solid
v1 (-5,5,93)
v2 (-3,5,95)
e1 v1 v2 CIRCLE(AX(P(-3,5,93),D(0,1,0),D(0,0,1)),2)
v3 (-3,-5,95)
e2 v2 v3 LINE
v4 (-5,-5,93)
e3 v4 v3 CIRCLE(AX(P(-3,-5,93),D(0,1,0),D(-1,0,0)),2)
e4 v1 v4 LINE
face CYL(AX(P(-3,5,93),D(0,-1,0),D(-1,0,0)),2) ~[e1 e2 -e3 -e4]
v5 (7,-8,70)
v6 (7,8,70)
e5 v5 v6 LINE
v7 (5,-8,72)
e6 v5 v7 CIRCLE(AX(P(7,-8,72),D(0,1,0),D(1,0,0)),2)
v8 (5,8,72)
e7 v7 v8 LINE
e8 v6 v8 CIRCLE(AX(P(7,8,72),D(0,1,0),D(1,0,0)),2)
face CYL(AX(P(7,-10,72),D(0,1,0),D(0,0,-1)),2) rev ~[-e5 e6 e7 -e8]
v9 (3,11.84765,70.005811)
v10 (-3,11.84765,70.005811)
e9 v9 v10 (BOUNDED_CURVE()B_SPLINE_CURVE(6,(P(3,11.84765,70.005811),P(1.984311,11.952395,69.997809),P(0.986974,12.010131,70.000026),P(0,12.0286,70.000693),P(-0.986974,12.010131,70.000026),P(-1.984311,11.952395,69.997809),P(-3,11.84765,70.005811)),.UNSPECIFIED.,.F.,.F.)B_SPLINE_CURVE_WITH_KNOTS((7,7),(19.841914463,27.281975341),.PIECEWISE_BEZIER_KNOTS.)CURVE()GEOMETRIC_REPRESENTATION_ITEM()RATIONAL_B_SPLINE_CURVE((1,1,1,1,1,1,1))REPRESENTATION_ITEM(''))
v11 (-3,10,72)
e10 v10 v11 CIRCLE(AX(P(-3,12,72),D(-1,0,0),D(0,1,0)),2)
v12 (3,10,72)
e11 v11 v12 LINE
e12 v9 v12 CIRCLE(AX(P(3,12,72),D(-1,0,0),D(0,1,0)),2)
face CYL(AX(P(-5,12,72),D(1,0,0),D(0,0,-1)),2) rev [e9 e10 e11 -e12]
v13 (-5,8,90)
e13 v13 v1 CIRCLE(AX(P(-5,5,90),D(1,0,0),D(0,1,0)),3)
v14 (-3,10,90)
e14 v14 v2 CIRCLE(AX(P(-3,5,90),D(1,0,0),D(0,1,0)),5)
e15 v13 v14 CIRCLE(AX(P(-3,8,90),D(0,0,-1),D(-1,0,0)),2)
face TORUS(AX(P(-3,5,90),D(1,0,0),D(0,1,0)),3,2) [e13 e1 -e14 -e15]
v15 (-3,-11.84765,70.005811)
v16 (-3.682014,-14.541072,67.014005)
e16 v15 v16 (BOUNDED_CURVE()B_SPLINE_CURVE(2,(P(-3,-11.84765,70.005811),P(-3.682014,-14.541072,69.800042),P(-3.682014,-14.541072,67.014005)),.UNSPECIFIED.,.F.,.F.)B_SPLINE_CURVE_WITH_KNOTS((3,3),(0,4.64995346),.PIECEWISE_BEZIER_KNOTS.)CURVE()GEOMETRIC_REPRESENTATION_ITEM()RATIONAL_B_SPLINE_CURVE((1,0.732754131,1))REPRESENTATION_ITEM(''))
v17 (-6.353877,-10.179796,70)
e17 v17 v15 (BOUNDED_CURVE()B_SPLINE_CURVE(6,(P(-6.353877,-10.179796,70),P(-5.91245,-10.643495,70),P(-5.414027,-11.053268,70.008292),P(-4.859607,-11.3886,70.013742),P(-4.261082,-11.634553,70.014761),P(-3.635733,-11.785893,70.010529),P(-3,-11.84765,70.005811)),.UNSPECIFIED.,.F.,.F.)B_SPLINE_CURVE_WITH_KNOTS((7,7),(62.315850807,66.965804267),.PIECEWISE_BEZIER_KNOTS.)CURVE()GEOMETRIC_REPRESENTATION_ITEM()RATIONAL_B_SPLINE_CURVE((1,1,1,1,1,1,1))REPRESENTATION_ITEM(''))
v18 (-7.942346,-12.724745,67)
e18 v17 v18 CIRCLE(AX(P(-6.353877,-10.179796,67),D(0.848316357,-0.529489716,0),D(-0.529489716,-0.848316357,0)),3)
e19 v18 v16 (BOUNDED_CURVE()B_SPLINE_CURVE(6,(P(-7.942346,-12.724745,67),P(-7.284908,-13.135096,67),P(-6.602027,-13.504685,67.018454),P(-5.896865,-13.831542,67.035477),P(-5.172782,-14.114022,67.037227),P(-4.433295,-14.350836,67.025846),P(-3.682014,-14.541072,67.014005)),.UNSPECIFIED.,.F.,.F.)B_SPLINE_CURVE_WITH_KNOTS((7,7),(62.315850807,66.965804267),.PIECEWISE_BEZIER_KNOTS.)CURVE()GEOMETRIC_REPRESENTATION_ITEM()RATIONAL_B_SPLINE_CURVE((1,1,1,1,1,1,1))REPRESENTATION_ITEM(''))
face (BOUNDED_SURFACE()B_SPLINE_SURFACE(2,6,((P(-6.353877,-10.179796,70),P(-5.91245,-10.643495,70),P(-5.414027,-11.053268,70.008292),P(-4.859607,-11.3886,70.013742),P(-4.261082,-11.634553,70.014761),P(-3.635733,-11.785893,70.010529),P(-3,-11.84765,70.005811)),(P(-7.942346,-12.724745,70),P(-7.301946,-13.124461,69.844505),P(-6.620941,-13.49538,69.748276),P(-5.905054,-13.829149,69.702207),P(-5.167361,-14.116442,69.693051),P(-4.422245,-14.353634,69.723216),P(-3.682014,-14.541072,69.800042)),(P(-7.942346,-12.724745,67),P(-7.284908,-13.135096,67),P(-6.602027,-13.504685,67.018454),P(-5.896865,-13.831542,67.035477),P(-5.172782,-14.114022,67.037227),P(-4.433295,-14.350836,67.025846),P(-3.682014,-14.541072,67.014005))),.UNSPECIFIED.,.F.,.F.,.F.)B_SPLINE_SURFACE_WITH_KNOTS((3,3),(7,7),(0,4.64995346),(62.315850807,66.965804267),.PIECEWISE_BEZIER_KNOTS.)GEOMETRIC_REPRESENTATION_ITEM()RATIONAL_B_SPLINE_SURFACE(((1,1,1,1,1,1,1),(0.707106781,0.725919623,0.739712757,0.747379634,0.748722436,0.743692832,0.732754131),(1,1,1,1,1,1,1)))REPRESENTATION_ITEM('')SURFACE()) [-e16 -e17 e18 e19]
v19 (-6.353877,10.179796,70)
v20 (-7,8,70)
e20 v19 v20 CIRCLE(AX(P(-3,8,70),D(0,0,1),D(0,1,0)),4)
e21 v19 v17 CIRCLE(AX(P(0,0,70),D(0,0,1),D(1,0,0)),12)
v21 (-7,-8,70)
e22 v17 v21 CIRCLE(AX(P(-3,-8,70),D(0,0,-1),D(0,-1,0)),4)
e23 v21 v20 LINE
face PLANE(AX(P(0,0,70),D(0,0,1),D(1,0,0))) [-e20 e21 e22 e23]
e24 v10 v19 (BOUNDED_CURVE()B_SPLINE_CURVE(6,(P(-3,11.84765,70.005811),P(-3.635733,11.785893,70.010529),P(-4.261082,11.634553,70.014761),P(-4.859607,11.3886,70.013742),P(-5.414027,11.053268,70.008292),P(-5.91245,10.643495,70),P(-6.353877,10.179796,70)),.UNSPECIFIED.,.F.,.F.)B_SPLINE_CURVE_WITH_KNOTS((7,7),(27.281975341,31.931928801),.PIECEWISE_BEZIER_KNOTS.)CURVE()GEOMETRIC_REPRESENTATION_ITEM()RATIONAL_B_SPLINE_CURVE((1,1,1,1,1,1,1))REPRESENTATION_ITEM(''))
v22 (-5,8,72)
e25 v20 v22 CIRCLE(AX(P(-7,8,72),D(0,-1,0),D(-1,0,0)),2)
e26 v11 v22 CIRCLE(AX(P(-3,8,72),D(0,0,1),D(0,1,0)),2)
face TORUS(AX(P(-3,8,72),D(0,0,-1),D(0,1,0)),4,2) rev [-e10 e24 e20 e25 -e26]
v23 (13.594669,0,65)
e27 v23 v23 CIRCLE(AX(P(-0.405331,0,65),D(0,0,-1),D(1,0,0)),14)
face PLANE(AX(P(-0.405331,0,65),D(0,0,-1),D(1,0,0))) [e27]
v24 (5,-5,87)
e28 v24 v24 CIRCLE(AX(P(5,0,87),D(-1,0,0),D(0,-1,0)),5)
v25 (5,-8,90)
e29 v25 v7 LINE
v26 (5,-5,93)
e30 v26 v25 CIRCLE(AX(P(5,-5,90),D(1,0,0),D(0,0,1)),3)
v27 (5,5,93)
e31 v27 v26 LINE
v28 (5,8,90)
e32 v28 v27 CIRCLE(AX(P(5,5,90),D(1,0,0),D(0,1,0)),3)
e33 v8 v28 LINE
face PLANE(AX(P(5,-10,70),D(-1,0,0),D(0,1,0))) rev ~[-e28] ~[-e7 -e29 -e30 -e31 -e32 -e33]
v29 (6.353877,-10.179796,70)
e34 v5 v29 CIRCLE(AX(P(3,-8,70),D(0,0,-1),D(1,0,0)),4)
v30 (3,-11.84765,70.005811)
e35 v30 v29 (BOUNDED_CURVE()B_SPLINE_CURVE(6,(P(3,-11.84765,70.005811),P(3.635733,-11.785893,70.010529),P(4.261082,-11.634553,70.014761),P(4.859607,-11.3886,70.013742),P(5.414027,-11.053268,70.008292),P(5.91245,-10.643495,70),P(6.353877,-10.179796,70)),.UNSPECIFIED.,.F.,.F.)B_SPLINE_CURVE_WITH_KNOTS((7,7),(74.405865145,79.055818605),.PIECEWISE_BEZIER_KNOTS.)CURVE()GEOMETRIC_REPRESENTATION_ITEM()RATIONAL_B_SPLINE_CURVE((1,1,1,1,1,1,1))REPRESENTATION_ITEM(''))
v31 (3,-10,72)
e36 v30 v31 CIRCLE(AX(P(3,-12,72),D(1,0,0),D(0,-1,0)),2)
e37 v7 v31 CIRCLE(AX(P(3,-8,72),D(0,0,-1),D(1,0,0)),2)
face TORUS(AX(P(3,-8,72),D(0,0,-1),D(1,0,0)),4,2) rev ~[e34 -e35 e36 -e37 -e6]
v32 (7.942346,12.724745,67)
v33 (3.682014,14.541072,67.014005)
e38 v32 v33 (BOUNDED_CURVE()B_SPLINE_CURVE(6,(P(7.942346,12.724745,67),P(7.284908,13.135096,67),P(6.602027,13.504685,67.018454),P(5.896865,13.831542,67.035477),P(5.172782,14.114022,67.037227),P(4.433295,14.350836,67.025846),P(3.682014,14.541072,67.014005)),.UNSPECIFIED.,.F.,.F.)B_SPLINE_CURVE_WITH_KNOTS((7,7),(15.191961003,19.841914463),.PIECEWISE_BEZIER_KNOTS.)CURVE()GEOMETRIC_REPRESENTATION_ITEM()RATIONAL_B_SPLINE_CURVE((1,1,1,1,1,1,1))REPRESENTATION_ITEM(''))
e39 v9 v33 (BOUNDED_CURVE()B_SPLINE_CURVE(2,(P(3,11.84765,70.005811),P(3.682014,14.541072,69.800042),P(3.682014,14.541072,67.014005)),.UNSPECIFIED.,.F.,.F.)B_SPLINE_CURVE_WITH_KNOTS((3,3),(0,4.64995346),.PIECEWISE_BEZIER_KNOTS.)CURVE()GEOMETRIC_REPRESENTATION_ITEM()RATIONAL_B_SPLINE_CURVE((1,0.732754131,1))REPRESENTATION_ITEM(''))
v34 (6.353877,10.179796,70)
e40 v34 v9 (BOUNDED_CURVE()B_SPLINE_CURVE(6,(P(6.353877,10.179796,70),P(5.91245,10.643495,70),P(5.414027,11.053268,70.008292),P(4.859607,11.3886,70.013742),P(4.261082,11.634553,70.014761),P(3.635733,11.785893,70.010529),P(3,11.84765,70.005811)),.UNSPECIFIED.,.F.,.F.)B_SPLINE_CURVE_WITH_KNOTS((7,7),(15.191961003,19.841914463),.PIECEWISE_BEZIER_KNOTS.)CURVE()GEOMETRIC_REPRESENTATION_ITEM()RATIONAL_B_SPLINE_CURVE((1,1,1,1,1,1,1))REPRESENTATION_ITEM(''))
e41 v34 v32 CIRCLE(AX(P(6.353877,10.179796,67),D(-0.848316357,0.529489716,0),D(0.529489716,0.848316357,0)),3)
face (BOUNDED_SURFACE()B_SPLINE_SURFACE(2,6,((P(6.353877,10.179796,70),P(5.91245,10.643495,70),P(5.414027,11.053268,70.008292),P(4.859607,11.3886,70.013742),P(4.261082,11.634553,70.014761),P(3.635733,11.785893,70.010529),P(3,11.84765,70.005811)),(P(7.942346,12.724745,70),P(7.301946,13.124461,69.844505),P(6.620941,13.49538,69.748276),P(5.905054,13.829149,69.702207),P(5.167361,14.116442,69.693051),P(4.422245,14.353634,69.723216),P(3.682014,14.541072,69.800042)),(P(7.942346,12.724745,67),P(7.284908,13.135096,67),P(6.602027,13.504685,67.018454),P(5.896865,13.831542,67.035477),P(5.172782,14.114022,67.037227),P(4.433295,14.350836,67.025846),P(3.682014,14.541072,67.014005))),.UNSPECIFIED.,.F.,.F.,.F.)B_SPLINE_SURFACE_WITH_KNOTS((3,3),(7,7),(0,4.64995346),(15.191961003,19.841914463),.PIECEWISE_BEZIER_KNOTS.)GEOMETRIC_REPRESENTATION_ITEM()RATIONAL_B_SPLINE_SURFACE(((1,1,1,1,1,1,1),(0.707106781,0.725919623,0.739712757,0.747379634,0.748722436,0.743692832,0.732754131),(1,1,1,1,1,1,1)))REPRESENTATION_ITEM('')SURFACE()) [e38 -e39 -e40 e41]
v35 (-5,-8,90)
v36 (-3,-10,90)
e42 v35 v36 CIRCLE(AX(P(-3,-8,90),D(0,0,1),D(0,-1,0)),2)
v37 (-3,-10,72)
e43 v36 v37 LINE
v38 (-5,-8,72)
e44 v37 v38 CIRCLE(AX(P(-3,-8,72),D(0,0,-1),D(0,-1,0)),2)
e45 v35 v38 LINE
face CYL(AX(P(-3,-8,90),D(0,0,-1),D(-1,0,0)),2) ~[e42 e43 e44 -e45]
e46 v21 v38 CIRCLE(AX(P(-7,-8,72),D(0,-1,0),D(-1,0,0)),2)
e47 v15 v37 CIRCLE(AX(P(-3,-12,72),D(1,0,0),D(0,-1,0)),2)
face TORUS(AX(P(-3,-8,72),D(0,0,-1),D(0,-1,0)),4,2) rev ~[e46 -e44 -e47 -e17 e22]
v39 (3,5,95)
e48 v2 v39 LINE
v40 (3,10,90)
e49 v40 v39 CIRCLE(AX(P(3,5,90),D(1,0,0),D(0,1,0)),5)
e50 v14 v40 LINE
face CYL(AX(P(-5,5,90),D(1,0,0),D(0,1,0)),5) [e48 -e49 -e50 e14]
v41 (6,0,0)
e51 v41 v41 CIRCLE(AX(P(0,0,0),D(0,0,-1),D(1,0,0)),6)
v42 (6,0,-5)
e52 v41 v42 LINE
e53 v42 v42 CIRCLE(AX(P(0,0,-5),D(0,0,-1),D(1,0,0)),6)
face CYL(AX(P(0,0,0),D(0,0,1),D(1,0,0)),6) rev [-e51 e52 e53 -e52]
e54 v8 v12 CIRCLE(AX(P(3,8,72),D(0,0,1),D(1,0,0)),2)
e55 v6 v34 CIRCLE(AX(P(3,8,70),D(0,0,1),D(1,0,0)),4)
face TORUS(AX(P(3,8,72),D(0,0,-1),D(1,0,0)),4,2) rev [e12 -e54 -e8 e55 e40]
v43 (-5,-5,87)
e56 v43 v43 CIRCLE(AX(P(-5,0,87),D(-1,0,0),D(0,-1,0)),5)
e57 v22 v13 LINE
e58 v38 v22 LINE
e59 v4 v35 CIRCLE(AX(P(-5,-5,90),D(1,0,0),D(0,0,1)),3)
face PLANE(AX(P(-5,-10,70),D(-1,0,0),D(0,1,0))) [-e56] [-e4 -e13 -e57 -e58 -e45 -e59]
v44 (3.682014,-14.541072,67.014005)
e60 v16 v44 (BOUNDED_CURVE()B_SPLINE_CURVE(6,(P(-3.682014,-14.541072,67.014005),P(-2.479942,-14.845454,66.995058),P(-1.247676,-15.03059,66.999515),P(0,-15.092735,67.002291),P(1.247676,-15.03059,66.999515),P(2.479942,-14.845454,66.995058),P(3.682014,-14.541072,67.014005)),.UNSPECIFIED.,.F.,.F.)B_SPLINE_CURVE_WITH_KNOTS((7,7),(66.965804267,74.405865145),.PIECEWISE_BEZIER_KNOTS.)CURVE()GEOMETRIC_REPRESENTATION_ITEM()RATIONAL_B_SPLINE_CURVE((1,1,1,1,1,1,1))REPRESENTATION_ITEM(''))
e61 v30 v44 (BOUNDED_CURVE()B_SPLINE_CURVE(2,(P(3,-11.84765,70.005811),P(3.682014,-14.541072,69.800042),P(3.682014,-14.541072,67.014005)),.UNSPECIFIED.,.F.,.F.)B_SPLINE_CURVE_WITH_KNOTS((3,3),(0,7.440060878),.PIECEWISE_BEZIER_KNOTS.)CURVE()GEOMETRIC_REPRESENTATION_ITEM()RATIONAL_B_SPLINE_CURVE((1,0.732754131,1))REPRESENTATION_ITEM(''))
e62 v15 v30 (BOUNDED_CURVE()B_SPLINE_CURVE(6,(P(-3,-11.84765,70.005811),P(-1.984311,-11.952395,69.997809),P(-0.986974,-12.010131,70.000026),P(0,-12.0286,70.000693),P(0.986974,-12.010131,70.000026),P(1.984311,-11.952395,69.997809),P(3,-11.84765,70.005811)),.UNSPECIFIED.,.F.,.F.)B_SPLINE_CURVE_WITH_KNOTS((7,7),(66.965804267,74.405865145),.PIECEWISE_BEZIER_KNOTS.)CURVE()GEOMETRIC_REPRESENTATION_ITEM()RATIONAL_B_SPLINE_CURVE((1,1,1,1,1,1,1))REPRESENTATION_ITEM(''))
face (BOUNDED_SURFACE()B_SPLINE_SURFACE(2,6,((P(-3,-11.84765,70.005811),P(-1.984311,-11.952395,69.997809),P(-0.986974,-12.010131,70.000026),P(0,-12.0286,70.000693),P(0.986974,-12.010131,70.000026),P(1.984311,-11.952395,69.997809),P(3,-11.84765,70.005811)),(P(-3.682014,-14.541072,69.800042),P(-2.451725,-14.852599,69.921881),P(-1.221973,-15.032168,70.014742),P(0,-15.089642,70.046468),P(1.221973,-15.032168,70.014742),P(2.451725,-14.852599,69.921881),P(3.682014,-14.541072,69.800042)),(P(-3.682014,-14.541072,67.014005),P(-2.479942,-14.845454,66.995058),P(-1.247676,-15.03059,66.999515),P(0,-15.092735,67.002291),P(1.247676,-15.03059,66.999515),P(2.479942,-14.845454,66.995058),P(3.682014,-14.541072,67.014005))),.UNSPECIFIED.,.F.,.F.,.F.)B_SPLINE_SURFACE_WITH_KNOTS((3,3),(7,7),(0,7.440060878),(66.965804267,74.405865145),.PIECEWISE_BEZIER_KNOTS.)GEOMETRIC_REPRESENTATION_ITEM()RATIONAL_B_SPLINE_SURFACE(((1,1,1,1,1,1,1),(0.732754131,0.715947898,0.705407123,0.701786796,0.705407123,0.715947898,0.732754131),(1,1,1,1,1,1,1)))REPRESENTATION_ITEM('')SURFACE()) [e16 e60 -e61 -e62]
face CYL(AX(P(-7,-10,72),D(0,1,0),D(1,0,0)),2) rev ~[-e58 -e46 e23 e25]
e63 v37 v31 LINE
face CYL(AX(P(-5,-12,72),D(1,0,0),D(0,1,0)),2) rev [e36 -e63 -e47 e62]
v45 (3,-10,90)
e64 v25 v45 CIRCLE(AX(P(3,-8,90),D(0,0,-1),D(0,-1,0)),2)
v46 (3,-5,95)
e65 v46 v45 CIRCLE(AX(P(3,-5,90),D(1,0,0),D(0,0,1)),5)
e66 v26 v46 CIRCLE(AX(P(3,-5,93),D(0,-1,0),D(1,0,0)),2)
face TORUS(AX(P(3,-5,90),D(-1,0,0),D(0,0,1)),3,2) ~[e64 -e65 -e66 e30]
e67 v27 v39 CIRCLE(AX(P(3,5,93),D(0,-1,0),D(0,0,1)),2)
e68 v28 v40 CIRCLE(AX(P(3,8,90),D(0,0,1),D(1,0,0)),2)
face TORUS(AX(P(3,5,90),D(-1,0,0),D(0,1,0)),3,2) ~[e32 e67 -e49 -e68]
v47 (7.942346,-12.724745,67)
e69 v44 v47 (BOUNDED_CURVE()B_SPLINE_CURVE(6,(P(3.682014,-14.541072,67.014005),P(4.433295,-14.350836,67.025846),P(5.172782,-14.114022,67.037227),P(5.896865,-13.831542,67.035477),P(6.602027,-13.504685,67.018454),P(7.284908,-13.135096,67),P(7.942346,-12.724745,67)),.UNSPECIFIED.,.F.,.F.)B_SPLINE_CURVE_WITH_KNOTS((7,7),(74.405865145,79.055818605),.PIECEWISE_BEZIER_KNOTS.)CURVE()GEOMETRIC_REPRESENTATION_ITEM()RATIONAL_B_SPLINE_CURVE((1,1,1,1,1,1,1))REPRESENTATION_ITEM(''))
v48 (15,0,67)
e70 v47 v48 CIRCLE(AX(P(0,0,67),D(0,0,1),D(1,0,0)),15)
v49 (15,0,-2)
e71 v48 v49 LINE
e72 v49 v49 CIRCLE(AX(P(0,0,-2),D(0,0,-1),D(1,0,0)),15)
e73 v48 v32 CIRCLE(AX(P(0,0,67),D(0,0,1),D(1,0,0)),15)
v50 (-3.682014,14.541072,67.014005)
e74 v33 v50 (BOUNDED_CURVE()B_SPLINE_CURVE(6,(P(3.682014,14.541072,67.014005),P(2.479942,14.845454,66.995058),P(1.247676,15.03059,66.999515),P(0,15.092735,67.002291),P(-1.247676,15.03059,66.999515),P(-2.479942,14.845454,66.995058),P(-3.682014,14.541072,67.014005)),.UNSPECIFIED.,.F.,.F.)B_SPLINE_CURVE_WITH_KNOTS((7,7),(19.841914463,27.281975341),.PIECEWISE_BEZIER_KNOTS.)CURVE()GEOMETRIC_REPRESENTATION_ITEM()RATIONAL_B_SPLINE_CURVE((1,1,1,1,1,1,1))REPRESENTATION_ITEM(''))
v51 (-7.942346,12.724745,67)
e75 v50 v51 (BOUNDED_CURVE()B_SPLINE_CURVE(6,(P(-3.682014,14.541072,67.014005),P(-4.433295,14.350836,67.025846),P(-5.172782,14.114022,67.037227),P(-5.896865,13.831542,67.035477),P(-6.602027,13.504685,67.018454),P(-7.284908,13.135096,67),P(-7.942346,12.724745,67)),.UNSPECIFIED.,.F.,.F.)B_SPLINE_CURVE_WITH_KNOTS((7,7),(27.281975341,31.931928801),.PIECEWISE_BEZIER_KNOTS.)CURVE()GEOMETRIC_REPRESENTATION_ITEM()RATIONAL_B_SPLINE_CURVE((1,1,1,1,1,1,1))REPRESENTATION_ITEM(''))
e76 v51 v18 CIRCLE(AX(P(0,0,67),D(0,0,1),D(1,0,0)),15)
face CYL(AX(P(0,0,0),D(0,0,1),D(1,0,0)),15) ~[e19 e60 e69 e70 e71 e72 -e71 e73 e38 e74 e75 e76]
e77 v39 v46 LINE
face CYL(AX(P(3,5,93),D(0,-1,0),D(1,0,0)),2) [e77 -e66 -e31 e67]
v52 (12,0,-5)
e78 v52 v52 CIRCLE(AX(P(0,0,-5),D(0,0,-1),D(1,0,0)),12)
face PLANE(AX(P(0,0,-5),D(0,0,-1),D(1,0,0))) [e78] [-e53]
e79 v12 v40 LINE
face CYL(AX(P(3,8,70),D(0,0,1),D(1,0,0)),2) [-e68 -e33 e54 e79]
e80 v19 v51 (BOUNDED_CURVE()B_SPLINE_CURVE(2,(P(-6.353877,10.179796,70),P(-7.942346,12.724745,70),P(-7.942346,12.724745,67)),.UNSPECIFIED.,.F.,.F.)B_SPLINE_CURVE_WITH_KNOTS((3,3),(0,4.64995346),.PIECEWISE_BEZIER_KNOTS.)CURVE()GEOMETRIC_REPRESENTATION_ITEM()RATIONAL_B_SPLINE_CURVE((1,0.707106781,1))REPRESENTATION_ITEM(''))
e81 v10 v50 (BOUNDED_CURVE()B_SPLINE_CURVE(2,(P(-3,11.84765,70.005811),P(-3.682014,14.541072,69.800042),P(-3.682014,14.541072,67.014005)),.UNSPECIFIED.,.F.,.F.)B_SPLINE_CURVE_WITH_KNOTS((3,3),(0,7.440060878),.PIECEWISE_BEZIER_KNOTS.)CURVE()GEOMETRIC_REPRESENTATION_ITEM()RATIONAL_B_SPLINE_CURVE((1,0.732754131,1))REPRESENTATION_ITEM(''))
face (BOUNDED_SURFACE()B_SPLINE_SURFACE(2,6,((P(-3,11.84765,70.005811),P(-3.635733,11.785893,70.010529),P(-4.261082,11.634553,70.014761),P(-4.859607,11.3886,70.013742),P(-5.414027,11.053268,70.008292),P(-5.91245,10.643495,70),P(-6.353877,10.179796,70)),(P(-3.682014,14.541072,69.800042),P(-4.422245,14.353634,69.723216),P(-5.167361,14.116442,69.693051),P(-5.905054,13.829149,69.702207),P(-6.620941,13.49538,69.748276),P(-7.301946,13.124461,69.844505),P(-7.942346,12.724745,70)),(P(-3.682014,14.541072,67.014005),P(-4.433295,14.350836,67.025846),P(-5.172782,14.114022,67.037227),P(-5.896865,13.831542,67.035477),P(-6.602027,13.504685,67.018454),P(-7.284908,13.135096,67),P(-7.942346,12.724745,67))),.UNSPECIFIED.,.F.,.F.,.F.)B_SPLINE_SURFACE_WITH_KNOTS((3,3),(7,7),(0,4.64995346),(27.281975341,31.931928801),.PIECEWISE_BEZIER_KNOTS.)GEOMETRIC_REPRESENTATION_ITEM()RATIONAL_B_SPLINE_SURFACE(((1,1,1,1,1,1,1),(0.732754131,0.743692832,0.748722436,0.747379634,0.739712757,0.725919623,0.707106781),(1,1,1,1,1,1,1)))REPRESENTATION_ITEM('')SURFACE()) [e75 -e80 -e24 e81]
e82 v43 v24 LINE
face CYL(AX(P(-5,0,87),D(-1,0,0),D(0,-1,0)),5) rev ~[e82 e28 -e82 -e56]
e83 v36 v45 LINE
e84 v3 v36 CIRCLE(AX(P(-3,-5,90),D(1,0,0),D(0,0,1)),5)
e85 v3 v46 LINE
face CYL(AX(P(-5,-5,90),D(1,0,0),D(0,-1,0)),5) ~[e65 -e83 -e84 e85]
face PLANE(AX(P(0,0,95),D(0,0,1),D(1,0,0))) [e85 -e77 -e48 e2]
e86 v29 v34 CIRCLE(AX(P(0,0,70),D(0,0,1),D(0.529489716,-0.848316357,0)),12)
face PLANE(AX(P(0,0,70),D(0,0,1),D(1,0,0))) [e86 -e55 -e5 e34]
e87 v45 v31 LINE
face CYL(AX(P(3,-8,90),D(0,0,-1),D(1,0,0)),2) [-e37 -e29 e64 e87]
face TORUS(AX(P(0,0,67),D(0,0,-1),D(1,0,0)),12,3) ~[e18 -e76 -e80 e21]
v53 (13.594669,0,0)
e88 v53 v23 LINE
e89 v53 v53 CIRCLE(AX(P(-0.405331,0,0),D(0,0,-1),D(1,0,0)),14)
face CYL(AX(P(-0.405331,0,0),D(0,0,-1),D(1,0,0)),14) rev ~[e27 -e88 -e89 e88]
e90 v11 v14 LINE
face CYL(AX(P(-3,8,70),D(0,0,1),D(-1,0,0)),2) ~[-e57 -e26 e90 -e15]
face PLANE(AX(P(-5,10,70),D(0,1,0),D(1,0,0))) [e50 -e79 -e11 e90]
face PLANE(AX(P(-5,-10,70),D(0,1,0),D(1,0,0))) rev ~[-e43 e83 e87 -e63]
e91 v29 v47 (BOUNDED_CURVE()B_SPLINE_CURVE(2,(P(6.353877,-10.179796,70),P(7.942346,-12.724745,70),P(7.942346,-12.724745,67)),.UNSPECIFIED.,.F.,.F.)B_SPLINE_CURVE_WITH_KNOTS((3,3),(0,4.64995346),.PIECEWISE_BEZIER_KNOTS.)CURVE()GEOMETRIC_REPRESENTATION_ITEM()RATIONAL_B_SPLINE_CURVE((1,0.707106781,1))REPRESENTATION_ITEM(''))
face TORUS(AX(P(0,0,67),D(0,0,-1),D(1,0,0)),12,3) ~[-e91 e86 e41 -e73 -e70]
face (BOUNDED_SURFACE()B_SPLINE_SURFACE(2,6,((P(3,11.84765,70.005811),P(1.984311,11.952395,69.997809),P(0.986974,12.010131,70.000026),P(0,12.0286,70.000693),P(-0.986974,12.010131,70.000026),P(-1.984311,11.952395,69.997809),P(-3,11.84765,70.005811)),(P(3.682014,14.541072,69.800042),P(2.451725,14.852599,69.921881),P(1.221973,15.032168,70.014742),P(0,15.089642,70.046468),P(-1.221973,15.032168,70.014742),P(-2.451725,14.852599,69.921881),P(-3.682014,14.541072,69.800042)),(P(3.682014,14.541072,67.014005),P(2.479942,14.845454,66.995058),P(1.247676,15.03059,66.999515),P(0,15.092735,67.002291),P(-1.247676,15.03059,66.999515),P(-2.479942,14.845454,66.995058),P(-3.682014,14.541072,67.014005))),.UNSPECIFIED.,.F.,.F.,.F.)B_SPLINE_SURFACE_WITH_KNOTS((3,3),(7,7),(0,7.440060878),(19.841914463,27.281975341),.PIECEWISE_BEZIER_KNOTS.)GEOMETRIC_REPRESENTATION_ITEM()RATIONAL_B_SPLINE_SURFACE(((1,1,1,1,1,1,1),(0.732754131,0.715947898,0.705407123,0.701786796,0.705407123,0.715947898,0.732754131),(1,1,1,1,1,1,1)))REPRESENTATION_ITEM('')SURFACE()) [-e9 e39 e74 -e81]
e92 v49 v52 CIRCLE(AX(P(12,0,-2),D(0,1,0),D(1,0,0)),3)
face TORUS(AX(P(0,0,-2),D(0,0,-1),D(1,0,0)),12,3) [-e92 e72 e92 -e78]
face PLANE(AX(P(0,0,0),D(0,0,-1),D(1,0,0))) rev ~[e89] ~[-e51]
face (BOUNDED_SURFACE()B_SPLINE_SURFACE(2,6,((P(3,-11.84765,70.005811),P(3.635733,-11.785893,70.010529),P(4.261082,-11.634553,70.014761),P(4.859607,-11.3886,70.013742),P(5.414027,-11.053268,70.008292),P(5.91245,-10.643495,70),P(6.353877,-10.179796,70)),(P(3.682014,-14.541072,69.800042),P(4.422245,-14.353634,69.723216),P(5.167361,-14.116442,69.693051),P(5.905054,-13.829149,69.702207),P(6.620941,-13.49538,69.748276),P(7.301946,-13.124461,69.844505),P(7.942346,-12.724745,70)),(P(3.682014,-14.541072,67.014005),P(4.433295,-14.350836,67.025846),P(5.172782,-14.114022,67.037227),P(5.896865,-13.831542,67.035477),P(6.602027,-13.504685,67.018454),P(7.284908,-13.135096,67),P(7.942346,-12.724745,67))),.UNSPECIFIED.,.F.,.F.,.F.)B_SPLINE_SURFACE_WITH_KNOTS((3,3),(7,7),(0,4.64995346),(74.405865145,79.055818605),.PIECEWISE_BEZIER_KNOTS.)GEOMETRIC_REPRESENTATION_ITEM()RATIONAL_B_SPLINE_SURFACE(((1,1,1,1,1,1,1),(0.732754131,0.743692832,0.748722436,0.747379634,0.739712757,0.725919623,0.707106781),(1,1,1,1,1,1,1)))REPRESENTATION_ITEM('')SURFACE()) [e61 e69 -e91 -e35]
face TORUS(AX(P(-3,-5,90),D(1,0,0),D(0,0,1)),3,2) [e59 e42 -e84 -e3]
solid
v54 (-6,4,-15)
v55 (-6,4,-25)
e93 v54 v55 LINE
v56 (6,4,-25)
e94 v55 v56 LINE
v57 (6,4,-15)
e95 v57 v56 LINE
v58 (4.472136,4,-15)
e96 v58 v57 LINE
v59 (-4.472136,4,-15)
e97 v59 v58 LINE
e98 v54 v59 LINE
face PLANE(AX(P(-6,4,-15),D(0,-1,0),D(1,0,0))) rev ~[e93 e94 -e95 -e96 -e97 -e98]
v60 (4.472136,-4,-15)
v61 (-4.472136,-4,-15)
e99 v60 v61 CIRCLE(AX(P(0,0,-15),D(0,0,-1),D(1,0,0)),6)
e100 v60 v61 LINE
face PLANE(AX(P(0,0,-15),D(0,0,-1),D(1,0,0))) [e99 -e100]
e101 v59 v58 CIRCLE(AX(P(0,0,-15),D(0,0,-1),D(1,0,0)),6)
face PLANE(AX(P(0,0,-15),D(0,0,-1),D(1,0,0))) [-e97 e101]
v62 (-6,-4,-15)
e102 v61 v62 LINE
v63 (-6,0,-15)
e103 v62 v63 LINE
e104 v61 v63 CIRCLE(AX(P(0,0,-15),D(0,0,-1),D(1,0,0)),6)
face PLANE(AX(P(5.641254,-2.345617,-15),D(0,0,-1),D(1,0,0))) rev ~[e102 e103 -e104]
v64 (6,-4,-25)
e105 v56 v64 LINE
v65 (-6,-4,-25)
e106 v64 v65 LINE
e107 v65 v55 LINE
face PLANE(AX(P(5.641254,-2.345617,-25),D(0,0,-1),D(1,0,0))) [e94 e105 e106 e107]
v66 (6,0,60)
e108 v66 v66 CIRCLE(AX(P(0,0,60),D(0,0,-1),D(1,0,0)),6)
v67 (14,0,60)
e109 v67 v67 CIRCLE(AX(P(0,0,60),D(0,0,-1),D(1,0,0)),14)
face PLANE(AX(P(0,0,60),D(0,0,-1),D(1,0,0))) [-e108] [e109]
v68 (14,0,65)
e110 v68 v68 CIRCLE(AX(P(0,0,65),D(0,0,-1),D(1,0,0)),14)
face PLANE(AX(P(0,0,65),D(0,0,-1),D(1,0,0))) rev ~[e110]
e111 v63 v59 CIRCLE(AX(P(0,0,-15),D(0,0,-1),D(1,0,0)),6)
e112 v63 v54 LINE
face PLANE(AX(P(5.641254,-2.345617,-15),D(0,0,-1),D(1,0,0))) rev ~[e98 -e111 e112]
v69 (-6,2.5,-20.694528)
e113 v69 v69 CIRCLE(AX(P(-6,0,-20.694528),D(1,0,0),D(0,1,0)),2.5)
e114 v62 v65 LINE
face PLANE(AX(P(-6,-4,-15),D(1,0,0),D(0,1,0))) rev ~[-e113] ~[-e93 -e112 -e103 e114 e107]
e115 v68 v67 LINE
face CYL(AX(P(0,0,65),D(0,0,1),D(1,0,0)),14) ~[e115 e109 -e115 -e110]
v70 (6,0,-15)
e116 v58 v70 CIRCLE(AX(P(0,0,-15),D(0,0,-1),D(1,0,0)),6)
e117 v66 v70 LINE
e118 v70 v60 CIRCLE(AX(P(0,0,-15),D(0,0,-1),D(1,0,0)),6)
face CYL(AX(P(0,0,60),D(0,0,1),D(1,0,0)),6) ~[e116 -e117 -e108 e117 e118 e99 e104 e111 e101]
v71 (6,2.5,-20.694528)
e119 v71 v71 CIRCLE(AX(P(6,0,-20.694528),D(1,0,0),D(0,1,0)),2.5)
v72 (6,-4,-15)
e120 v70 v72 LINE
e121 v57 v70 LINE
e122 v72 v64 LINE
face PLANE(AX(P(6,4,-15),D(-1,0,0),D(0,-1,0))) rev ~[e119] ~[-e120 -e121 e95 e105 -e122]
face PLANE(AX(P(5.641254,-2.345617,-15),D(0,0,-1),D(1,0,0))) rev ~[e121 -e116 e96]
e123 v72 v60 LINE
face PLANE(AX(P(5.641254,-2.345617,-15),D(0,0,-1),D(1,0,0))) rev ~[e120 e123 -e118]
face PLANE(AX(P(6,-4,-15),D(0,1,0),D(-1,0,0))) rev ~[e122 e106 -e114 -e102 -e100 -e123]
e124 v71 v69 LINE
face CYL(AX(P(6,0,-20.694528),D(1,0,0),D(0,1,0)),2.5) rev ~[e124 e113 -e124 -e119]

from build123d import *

# Parameters (mm, degrees)
F0_R      = 15
F1_DEPTH  = 70
F2_R      = 14
F3_DEPTH  = 65
F4_R      = 15
F4_R_2    = 14
F4_R_3    = 6
F5_DEPTH  = 5
F6_W      = 10
F6_H      = 20
F7_DEPTH  = 25
F8_R      = 5
F9_DEPTH  = 25
F10_R     = 5
F11_R     = 2
F12_R     = 14
F13_DEPTH = 5
F14_R     = 6
F15_DEPTH = 75
F17_DEPTH = 10
F18_R     = 2.5
F19_DEPTH = 25
F20_R     = 3


with BuildPart() as f1:
    # F0 (on Top) → F1 (new body)
    with BuildSketch(Plane.XY):
        Circle(F0_R)
    extrude(amount=F1_DEPTH)

    # F2 (on face) → F3 (cut)
    with BuildSketch(Plane(origin=(0, 0, 0), x_dir=(1, 0, 0), z_dir=(0, 0, -1))):
        with Locations((-0.4053307348, 0)):
            Circle(F2_R)
    extrude(amount=-F3_DEPTH, mode=Mode.SUBTRACT)

    # F4 (on face) → F5 (join)
    with BuildSketch(Plane(origin=(0, 0, 0), x_dir=(1, 0, 0), z_dir=(0, 0, -1))):
        Circle(F4_R)
        with Locations((-0.4053307348, 0)):
            Circle(F4_R_2, mode=Mode.SUBTRACT)
        with Locations((-0.4053307348, 0)):
            Circle(F4_R_2)
        Circle(F4_R_3, mode=Mode.SUBTRACT)
    extrude(amount=F5_DEPTH)

    # F6 (on face) → F7 (join)
    with BuildSketch(Plane.XY.offset(70)):
        Rectangle(F6_W, F6_H)
    extrude(amount=F7_DEPTH)

    # F8 (on face) → F9 (cut)
    with BuildSketch(Plane(origin=(-5, 0, 0), x_dir=(0, -1, 0), z_dir=(-1, 0, 0))):
        with Locations((0, 87)):
            Circle(F8_R)
    extrude(amount=-F9_DEPTH, mode=Mode.SUBTRACT)

    # F10
    f10_edges = [f1.edges().sort_by_distance(p)[0] for p in [
        (0, 10, 95),
        (0, -10, 95),
    ]]
    fillet(f10_edges, radius=F10_R)

    # F11
    f11_edges = [f1.edges().sort_by_distance(p)[0] for p in [
        (-5, 10, 80),
        (5, 10, 80),
        (5, 0, 70),
        (5, -10, 80),
        (5, -8.535534, 93.535534),
        (5, 0, 95),
        (5, 8.535534, 93.535534),
        (-5, -10, 80),
        (0, -10, 70),
        (-5, -8.535534, 93.535534),
        (0, 10, 70),
        (-5, 0, 70),
        (-5, 0, 95),
        (-5, 8.535534, 93.535534),
    ]]
    fillet(f11_edges, radius=F11_R)

    # F20
    f20_edges = [f1.edges().sort_by_distance(p)[0] for p in [
        (-15, 0, -5),
        (-15, 0, 70),
    ]]
    fillet(f20_edges, radius=F20_R)


with BuildPart() as f13:
    # F12 (on face) → F13 (new body)
    with BuildSketch(Plane(origin=(0, 0, 65), x_dir=(1, 0, 0), z_dir=(0, 0, -1))):
        Circle(F12_R)
    extrude(amount=F13_DEPTH)

    # F14 (on face) → F15 (join)
    with BuildSketch(Plane(origin=(0, 0, 60), x_dir=(1, 0, 0), z_dir=(0, 0, -1))):
        Circle(F14_R)
    extrude(amount=F15_DEPTH)

    # F16 (on face) → F17 (join)
    with BuildSketch(Plane(origin=(0, 0, -15), x_dir=(1, 0, 0), z_dir=(0, 0, -1))):
        with BuildLine():
            Line((6, 0), (6, 4))
            Line((6, 4), (4.472135955, 4))
            ThreePointArc((4.472135955, 4), (5.6050341538, 2.1409325386), (6, 0))
        make_face()
        with BuildLine():
            ThreePointArc((6, 0), (5.6050341538, 2.1409325386), (4.472135955, 4))
            Line((4.472135955, 4), (-4.472135955, 4))
            ThreePointArc((-4.472135955, 4), (-5.6050341538, 2.1409325386), (-6, 0))
            ThreePointArc((-6, 0), (-5.6050341538, -2.1409325386), (-4.472135955, -4))
            Line((-4.472135955, -4), (4.472135955, -4))
            ThreePointArc((4.472135955, -4), (5.6050341538, -2.1409325386), (6, 0))
        make_face()
        with BuildLine():
            ThreePointArc((-6, 0), (-5.6050341538, 2.1409325386), (-4.472135955, 4))
            Line((-4.472135955, 4), (-6, 4))
            Line((-6, 4), (-6, 0))
        make_face()
        with BuildLine():
            ThreePointArc((-4.472135955, -4), (-5.6050341538, -2.1409325386), (-6, 0))
            Line((-6, 0), (-6, -4))
            Line((-6, -4), (-4.472135955, -4))
        make_face()
        with BuildLine():
            Line((6, -4), (6, 0))
            ThreePointArc((6, 0), (5.6050341538, -2.1409325386), (4.472135955, -4))
            Line((4.472135955, -4), (6, -4))
        make_face()
    extrude(amount=F17_DEPTH)

    # F18 (on face) → F19 (cut)
    with BuildSketch(Plane.YZ.offset(6)):
        with Locations((0, -20.694527775)):
            Circle(F18_R)
    extrude(amount=-F19_DEPTH, mode=Mode.SUBTRACT)


solid = Compound([f1.part, f13.part])
